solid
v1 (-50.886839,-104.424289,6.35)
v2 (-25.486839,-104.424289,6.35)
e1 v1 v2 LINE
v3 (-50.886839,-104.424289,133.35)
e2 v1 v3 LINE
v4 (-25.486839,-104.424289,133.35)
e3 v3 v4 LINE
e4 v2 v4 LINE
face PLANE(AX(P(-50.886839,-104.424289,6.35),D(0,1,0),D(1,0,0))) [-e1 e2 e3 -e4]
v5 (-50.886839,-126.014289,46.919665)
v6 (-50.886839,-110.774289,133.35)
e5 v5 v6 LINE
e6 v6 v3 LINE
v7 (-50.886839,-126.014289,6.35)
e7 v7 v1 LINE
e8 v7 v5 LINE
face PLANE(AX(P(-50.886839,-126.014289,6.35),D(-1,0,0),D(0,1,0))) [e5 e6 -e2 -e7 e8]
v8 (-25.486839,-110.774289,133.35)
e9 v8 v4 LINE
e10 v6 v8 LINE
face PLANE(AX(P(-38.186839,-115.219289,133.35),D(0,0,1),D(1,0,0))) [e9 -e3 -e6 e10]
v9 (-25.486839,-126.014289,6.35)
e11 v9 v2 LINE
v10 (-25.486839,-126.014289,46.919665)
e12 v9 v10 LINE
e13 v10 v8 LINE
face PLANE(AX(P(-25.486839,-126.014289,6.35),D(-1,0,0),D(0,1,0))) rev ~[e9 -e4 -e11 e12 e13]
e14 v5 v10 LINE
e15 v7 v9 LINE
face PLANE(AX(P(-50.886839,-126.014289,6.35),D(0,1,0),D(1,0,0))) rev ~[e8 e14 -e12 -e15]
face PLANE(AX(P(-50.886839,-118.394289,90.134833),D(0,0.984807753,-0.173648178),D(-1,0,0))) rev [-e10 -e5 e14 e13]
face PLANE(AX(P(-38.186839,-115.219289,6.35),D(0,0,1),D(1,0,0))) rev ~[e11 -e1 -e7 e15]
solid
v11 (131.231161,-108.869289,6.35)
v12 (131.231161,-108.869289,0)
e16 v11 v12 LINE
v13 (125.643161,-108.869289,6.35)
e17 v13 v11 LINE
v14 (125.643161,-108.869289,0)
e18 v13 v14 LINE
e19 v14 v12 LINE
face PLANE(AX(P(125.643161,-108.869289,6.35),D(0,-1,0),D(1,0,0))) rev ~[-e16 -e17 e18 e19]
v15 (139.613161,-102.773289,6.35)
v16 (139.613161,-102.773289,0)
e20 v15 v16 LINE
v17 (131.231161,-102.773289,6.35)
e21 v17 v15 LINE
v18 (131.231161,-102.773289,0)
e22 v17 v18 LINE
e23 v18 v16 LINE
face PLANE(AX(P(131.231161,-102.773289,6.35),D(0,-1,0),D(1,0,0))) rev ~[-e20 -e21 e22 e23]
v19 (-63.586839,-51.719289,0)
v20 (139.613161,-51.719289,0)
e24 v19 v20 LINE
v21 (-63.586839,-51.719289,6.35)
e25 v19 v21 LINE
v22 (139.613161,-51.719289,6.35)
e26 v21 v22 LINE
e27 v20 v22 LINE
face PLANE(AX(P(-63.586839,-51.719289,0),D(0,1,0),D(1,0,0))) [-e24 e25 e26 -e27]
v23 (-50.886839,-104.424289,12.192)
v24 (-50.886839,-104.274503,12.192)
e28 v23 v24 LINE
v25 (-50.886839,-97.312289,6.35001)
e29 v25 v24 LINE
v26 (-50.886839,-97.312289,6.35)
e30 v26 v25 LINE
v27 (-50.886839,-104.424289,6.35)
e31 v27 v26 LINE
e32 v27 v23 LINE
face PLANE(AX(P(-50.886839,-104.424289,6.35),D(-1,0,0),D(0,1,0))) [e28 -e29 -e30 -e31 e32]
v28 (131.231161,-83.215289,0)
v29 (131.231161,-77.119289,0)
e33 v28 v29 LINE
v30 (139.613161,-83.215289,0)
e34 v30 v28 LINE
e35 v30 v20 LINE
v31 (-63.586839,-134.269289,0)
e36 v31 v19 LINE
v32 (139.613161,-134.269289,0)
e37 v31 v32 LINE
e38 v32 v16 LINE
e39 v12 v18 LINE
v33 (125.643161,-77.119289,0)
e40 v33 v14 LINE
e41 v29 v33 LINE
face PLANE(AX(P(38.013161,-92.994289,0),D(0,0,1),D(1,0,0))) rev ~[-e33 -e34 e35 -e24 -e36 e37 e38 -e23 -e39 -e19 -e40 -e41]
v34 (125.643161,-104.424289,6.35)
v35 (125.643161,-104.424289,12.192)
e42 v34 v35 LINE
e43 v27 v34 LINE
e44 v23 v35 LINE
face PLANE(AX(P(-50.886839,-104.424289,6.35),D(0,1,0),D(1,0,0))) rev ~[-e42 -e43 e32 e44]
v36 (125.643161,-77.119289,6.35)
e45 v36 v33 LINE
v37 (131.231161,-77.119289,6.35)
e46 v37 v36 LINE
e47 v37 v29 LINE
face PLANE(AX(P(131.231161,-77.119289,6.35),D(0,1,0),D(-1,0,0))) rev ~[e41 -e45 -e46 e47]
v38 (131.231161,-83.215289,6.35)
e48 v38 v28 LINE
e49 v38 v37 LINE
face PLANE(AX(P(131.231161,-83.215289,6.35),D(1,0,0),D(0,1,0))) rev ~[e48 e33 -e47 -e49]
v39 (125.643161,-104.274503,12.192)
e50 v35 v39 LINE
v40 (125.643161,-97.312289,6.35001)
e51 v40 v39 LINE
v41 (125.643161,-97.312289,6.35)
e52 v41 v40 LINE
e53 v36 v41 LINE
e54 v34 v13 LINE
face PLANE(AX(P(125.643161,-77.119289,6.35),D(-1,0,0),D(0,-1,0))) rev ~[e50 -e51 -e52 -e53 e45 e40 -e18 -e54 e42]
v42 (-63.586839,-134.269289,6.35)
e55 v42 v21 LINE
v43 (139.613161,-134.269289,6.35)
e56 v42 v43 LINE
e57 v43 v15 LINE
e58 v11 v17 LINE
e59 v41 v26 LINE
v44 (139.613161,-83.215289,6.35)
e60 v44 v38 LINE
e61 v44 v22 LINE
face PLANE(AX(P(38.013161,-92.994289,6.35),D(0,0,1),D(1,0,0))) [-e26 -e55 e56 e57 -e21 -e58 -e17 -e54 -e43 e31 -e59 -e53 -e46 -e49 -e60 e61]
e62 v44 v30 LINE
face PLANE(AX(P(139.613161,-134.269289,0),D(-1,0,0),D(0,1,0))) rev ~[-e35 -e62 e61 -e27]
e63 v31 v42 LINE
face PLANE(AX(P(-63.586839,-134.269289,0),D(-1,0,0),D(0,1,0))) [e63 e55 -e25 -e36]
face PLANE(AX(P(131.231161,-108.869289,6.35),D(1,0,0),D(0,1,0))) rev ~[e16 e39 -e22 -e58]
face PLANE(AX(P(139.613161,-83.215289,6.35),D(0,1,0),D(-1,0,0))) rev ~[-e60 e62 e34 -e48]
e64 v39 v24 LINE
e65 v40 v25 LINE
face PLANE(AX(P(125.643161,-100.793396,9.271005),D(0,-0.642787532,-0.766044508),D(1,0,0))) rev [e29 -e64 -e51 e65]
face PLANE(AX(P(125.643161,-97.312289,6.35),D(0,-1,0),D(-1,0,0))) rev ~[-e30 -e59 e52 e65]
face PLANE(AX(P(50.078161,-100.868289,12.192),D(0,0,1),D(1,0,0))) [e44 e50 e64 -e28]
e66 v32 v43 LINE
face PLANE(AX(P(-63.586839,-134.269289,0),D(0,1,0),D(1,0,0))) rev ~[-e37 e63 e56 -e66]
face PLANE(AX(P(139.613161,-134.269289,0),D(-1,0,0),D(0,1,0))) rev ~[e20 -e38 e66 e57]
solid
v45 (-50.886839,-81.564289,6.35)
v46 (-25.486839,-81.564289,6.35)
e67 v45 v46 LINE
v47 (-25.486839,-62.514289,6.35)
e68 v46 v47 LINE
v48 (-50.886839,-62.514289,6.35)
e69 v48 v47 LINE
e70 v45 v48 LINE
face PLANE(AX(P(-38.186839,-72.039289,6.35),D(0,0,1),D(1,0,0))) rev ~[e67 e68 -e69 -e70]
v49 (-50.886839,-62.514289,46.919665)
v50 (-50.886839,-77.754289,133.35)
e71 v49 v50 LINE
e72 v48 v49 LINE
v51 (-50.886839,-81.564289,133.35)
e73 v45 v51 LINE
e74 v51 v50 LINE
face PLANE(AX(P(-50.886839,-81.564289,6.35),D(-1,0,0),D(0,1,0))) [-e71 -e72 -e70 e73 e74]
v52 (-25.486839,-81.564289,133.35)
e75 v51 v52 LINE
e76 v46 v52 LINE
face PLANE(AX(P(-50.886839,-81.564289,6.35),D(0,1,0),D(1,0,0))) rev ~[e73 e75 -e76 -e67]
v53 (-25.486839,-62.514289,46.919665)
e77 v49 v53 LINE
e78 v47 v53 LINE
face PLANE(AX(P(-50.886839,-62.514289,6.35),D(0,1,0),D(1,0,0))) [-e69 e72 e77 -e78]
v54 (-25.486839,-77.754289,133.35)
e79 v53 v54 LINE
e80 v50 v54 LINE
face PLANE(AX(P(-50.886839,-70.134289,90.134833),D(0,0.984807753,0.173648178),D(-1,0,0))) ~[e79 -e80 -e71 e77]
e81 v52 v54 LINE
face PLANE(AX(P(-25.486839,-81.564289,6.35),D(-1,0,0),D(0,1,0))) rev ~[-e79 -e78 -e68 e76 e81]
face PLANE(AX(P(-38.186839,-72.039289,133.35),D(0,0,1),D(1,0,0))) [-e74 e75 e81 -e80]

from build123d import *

# Parameters (mm, degrees)
F0_W     = 203.2
F0_H     = 82.55
F1_DEPTH = 6.35
F3_DEPTH = 25.4
F4_W     = 25.4
F4_H     = 21.59
F5_DEPTH = 127
F4_H_2   = 19.05
F6_SIZE2 = 15.24
F6_SIZE  = 86.430334931
F7_SIZE2 = 15.24
F7_SIZE  = 86.430334931
F4_W_2   = 151.13
F4_H_3   = 7.112
F8_DEPTH = 5.842
F9_SIZE2 = 6.962214
F9_SIZE  = 5.84199


# Not quite as in the source:
# - a fillet or chamfer is up to 0.001 mm smaller than in the source, because OpenCascade refuses the exact size
# - a feature names something its author has since deleted; it is built from what else it names


with BuildPart() as f1:
    # F0 (on Top) → F1 (new body)
    with BuildSketch(Plane.XY):
        with Locations((38.0131614566, -92.994289273)):
            Rectangle(F0_W, F0_H)
    extrude(amount=F1_DEPTH)

    # F2 (on face) → F3 (cut)
    with BuildSketch(Plane.XY.offset(6.35)):
        Polygon((131.2311614566, -83.215289273), (131.2311614566, -77.119289273), (125.6431614566, -77.119289273), (125.6431614566, -108.869289273), (131.2311614566, -108.869289273), (131.2311614566, -102.773289273), (139.6131614566, -102.773289273), (139.6131614566, -83.215289273), align=None)
    extrude(amount=-F3_DEPTH, mode=Mode.SUBTRACT)

    # F4 (on face) → F8 (join)
    with BuildSketch(Plane.XY.offset(6.35)):
        with Locations((50.0781614566, -100.868289273)):
            Rectangle(F4_W_2, F4_H_3)
        with Locations((-38.1868385434, -100.868289273)):
            Rectangle(F4_W, F4_H_3)
    extrude(amount=F8_DEPTH)

    # F9 (size 5.842 and 6.9622244879 in the source; OpenCascade refuses exactly that, so slightly less here)
    f9_edges = [f1.edges().sort_by_distance(p)[0] for p in [
        (37.378161, -97.312289, 12.192),
    ]]
    f9_side = f1.faces().sort_by_distance((37.378161, -97.312289, 9.271))[0]
    chamfer(f9_edges, length=F9_SIZE, length2=F9_SIZE2, reference=f9_side)


with BuildPart() as f5:
    # F4 (on face) → F5 (new body)
    with BuildSketch(Plane.XY.offset(6.35)):
        with Locations((-38.1868385434, -115.219289273)):
            Rectangle(F4_W, F4_H)
    extrude(amount=F5_DEPTH)

    # F6
    f6_edges = [f5.edges().sort_by_distance(p)[0] for p in [
        (-38.186839, -126.014289, 133.35),
    ]]
    f6_side = f5.faces().sort_by_distance((-38.186839, -126.014289, 69.85))[0]
    chamfer(f6_edges, length=F6_SIZE, length2=F6_SIZE2, reference=f6_side)


with BuildPart() as f5b:
    # F4 (on face) → F5, piece 2 (new body)
    with BuildSketch(Plane.XY.offset(6.35)):
        with Locations((-38.1868385434, -72.039289273)):
            Rectangle(F4_W, F4_H_2)
    extrude(amount=F5_DEPTH)

    # F7
    f7_edges = [f5b.edges().sort_by_distance(p)[0] for p in [
        (-38.186839, -62.514289, 133.35),
    ]]
    f7_side = f5b.faces().sort_by_distance((-38.186839, -62.514289, 69.85))[0]
    chamfer(f7_edges, length=F7_SIZE, length2=F7_SIZE2, reference=f7_side)


solid = Compound([f1.part, f5.part, f5b.part])
